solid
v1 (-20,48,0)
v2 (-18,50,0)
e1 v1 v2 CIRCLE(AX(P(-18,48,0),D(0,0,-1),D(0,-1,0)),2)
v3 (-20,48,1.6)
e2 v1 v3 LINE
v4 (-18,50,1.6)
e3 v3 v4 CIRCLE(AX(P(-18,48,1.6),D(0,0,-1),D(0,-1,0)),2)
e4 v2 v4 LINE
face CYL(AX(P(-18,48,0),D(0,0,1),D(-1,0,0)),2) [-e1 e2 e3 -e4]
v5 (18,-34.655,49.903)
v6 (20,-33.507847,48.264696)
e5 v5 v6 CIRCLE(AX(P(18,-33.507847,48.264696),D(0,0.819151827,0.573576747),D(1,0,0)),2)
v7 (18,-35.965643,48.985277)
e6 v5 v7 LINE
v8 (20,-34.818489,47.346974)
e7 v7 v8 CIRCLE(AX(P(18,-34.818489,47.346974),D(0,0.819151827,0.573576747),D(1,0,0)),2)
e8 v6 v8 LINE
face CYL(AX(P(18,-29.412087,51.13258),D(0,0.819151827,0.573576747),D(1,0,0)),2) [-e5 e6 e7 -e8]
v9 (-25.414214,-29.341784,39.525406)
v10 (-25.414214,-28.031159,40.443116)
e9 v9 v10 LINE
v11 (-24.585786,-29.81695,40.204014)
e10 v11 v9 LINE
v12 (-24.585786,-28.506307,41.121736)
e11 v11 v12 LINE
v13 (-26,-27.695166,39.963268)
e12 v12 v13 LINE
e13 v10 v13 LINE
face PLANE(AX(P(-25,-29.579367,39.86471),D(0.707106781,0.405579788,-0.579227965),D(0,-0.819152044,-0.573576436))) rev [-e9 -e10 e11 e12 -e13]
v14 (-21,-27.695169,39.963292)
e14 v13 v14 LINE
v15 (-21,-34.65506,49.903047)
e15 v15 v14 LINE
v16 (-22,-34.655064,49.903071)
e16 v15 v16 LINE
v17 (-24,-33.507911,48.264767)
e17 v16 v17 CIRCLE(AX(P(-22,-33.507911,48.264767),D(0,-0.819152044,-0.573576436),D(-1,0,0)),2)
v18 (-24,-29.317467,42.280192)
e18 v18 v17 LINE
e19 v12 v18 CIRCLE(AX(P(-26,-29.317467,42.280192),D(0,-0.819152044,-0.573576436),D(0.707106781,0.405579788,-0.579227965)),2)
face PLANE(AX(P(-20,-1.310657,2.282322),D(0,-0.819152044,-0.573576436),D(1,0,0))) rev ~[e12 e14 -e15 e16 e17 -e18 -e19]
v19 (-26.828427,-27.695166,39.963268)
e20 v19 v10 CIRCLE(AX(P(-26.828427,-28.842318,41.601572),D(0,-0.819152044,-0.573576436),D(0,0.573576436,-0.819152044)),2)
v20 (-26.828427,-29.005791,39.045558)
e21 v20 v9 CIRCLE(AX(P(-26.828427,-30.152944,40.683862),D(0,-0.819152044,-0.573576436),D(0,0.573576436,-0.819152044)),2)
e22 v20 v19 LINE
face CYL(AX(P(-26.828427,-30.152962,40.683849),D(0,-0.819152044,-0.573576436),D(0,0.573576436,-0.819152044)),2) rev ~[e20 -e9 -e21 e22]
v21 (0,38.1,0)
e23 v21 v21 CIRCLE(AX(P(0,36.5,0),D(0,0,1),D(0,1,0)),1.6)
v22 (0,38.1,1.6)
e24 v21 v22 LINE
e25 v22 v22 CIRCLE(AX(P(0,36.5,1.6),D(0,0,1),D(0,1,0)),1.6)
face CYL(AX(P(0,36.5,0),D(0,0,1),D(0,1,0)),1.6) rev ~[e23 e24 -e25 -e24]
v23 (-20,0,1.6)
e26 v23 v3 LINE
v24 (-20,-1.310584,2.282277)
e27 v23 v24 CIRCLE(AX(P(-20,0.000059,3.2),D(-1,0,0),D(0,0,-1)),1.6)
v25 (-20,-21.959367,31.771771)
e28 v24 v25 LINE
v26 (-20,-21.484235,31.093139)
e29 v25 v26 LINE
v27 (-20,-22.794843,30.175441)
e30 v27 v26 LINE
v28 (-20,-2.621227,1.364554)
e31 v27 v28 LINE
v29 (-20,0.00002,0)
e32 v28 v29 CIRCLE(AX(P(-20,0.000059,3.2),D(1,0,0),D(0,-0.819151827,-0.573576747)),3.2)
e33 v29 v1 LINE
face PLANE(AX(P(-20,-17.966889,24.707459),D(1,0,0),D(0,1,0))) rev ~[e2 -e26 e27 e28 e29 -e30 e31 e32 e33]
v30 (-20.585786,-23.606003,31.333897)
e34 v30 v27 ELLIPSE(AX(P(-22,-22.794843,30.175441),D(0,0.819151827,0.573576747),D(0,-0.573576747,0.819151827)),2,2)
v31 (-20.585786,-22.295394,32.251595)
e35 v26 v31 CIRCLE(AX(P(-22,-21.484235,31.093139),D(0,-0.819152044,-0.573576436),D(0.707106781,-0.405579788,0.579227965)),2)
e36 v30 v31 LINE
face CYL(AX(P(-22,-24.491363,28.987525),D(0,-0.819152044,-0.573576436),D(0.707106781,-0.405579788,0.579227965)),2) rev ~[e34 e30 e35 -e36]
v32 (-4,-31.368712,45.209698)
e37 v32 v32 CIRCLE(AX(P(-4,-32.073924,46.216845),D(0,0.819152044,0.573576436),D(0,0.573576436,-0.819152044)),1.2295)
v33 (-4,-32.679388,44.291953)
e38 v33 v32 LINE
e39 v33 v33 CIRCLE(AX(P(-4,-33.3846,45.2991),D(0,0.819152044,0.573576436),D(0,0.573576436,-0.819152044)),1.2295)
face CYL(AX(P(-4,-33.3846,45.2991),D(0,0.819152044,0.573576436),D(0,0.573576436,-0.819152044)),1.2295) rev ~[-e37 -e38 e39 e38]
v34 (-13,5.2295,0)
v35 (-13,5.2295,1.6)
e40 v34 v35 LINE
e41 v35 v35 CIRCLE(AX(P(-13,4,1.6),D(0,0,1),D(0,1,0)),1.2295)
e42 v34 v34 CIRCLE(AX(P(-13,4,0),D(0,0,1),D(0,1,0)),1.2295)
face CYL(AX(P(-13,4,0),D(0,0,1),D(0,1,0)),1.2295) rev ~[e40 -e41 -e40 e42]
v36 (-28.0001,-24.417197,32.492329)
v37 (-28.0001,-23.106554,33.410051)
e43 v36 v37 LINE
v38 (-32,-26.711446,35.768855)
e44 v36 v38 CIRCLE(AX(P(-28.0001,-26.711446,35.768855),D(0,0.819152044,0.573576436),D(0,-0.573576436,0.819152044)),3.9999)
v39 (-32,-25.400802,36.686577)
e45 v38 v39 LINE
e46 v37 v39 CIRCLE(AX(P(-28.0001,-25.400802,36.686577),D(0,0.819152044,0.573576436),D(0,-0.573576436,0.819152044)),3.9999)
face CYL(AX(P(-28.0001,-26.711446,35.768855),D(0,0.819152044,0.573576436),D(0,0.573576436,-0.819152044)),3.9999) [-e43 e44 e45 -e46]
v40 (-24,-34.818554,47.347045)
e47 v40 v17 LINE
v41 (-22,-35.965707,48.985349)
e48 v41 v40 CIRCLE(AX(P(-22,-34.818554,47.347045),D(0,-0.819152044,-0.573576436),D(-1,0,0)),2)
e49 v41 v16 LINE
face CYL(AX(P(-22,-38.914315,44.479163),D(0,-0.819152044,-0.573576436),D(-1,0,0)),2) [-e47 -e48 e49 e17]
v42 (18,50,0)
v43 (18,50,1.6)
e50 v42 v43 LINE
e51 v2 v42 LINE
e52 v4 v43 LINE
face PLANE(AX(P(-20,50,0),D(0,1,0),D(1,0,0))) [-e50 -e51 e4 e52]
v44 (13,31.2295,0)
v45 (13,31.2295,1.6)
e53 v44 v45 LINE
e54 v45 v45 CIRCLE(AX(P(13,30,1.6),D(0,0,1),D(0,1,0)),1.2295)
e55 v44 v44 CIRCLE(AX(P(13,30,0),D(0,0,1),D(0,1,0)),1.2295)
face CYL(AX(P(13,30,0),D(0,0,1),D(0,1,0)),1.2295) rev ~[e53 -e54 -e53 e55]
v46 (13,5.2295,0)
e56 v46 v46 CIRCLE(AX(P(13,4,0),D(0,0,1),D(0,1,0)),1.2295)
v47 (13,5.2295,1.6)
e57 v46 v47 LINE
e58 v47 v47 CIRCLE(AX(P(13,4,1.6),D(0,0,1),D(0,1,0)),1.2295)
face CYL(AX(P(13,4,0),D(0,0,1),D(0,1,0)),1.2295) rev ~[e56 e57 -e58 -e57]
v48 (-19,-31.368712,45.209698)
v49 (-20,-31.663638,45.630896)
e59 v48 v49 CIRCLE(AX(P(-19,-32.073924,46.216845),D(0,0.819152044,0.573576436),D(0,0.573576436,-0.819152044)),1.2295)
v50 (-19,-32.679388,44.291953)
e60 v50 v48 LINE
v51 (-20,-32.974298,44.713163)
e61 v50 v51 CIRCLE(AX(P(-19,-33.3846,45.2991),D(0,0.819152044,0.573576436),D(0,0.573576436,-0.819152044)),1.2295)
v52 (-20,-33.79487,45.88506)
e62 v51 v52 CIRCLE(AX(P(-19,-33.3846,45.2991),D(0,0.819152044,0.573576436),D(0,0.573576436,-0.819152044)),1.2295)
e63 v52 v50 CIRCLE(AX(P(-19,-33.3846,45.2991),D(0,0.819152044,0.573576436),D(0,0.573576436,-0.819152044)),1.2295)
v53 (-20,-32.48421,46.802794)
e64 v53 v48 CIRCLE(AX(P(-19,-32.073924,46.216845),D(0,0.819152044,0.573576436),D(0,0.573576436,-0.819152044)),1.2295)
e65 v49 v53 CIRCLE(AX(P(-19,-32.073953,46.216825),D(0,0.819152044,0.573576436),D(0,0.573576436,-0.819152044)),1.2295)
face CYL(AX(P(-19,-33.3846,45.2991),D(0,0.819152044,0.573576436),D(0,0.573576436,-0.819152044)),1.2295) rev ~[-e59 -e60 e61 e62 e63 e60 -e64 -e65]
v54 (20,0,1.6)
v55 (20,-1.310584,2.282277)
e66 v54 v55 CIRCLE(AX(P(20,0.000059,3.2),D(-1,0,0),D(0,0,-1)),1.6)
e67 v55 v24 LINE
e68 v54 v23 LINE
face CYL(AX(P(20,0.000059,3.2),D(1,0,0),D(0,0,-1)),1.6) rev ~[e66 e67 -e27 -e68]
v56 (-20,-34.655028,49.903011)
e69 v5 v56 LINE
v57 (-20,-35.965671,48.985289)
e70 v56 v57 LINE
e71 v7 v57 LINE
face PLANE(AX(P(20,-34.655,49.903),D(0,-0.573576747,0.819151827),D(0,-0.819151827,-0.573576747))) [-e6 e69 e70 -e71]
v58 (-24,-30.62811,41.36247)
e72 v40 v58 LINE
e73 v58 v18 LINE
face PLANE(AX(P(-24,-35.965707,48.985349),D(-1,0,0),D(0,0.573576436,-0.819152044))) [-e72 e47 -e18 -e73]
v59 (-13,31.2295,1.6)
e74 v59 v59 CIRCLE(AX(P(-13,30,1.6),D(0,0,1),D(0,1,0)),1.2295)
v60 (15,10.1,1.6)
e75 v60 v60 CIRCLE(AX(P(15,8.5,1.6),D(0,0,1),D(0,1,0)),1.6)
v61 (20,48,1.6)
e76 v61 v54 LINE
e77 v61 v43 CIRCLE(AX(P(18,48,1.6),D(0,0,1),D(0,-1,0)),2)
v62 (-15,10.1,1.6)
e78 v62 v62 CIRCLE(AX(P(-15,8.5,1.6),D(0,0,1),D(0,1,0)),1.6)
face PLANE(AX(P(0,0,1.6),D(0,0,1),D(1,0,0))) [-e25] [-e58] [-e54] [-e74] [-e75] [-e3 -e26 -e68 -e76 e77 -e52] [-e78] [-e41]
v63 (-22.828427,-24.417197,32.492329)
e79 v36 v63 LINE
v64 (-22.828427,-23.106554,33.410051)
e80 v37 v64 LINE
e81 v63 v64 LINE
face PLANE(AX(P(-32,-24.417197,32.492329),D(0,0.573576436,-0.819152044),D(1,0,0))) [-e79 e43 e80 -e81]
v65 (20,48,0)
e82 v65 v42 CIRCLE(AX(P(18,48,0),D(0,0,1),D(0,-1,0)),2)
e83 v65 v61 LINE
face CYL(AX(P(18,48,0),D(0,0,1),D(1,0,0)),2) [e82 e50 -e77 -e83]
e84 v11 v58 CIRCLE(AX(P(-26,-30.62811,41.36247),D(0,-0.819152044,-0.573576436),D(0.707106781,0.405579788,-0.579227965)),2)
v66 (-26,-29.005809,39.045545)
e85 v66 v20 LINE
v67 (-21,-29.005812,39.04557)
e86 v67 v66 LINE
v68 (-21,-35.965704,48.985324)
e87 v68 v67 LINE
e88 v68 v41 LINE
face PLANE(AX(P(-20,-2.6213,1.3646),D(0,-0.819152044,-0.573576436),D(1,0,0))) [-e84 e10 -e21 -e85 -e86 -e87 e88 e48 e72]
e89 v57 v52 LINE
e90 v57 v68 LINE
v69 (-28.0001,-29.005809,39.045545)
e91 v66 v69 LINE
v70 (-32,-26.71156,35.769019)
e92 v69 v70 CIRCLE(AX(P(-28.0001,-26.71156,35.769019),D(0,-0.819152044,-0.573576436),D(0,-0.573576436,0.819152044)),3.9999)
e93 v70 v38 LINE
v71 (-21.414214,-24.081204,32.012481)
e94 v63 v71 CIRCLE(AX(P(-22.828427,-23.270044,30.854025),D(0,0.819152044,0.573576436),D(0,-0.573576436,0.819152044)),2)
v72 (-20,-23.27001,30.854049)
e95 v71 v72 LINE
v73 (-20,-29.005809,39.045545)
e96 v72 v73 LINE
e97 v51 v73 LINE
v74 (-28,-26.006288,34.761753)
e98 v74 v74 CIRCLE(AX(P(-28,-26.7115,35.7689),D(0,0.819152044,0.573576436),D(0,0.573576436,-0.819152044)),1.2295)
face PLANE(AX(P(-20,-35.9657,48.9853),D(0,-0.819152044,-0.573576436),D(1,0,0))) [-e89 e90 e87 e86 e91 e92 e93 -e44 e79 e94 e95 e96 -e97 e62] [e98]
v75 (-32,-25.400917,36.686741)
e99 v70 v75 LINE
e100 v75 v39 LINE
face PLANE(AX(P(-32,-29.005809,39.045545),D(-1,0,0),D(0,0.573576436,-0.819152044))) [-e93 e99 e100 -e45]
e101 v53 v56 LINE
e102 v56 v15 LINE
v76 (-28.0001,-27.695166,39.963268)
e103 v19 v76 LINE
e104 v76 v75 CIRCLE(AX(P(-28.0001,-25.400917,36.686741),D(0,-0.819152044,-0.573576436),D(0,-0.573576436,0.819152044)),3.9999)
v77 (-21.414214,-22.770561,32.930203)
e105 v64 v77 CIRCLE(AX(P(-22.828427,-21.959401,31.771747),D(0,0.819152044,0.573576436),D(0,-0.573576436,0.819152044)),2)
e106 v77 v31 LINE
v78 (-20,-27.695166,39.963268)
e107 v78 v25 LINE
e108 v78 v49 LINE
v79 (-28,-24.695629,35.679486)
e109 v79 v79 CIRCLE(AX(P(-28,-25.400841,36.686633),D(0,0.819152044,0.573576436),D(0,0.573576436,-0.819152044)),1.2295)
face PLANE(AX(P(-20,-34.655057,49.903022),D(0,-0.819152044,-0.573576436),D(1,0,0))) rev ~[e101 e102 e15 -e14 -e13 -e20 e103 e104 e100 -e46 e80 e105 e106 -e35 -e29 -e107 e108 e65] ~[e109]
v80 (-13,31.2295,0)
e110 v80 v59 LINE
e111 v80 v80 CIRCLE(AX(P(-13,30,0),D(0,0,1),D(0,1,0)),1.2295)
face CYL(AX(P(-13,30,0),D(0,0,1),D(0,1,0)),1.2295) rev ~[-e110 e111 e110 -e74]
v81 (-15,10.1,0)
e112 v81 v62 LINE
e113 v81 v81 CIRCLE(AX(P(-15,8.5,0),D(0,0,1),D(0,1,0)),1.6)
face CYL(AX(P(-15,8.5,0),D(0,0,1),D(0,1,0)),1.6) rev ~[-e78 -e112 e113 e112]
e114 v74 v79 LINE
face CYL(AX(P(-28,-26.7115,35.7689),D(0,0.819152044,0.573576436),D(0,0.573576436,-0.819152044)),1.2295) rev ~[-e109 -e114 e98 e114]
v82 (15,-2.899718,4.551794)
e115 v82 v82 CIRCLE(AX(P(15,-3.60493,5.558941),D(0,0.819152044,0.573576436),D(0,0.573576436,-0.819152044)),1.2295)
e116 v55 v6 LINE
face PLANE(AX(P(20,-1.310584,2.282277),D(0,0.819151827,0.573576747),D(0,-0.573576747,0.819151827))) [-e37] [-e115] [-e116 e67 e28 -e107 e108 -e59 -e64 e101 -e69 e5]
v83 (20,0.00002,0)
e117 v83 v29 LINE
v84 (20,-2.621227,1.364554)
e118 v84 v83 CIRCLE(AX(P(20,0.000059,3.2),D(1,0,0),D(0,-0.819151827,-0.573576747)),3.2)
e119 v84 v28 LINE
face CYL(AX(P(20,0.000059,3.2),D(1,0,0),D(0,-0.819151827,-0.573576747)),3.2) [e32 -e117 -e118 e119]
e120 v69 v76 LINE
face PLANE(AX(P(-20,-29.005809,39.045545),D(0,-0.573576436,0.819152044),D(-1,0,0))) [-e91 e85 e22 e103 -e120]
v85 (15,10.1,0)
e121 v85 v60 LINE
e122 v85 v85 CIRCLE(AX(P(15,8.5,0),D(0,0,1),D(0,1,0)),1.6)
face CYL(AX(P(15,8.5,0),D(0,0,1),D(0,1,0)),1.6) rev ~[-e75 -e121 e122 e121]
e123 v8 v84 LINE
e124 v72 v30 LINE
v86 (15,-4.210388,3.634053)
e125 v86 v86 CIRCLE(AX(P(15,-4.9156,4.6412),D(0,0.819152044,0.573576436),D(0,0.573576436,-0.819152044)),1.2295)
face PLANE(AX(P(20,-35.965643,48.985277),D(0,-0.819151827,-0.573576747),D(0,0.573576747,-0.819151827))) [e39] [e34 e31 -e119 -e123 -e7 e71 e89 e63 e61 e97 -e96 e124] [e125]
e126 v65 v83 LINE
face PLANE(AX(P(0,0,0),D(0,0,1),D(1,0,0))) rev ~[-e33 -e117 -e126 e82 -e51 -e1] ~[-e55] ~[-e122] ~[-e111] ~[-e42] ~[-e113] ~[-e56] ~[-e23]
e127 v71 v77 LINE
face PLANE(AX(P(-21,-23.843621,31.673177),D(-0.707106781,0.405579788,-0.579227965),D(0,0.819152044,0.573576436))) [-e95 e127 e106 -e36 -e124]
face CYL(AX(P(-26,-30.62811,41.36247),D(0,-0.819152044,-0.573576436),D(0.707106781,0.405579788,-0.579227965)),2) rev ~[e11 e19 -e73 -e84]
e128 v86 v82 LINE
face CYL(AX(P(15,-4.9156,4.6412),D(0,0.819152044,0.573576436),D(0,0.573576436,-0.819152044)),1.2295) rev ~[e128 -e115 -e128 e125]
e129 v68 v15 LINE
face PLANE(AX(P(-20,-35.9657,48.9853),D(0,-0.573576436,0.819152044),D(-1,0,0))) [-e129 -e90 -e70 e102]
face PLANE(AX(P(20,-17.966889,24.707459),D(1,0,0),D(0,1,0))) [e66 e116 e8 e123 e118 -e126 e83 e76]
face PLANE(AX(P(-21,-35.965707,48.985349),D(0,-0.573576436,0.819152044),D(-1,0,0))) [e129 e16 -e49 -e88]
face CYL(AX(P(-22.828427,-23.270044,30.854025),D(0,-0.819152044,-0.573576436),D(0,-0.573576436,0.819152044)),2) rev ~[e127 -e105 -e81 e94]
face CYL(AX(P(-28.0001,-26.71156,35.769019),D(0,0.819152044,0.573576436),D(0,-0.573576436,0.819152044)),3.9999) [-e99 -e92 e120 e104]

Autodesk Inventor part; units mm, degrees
ref_plane "YZ Plane" through (0, 0, 0) normal (1, 0, 0) x (0, 1, 0)
ref_plane "XZ Plane" through (0, 0, 0) normal (0, 1, 0) x (-1, 0, 0)
ref_plane "XY Plane" through (0, 0, 0) normal (0, 0, 1) x (1, 0, 0)
sketch "スケッチ1" plane through (0, 0, 0) normal (0, 0, 1) x (1, 0, 0)
  line L0 (20, 0) -> (-20, 0)
  line L1 (-20, 0) -> (-20, 50)
  line L2 (-20, 50) -> (20, 50)
  line L3 (20, 50) -> (20, 0)
  line L4 (20, 0) -> (-20, 50) construction
  line L5 (-20, 0) -> (20, 50) construction
  point P0 (0, 0)
  point P1 (0, 25)
  point P2 (0, 0)
  point P3 (0, 25)
  dimension "d0" = 40
  dimension "d1" = 50
extrude "プレート1" add sketch "スケッチ1" along normal blind 1.6
sketch "スケッチ2" plane through (20, -1.3106, 2.2823) normal (0, -0.819152, -0.5735764) x (1, 0, 0)
  line L0 (-40, 0) -> (0, 0)
  line L1 (0, 0) -> (0, 58.1342)
  line L2 (0, 58.1342) -> (-40, 58.1342)
  line L3 (-40, 58.1342) -> (-40, 0)
edge flange "フランジ1" height 59.8 angle 55 thickness 1.6 bend radius 1.6 thickness toward (0, -0.819152, -0.5735764) relief tear relief width 1.6 relief depth 0.8 edges at (0, 0, 1.6) wall of the first edge with corners at (-20, -1.3106, 2.2823) (20, -1.3106, 2.2823) (20, -34.655, 49.903) (-20, -34.655, 49.903)
bend "曲げ1"
corner "コーナー1"
sketch "スケッチ3" plane through (0, 0, 0) normal (0, 0, -1) x (-1, 0, 0)
  line L0 (-20, 0) -> (20, 0) projected
  line L1 (20, 0) -> (20, 50) projected
  line L2 (20, 50) -> (-20, 50) projected
  line L3 (-20, 50) -> (-20, 0) projected
  line L4 (-20, 0) -> (20, 0) projected
  point P0 (0, 0)
  point P1 (-13, 4)
  point P2 (13, 4)
  point P3 (0, 4)
  point P4 (0, 0)
  point P5 (0, 0)
  point P6 (0, 4)
  point P7 (-13, 30)
  point P8 (13, 30)
  dimension "d62" = 4
  dimension "d85" = 26
  dimension "d86" = 13
  dimension "d90" = 26
hole "穴1" at (13, 4, 0) at (-13, 4, 0) at (13, 30, 0) at (-13, 30, 0) direction (0, 0, 1) diameter 2.459 depth 8.8 tip angle 118 thread size "M3x0.5" class "6H" standard "ISO Metric profile"
sketch "スケッチ4" plane through (-20, -35.9657, 48.9853) normal (0, -0.819152, -0.5735764) x (1, 0, 0)
  line L0 (0, -58.1342) -> (40, -58.1342) projected
  line L1 (40, 0) -> (40, -58.1342) projected
  line L2 (0, 0) -> (40, 0) projected
  line L3 (0, -58.1342) -> (0, 0) projected
  point P0 (20, -60.7555)
  point P1 (35, -54.1342)
  dimension "d23" = 5
  dimension "d24" = 4
hole "穴2" at (15, -4.9156, 4.6412) direction (0, 0.819152, 0.5735764) diameter 2.459 end through all thread size "M3x0.5" class "6H" standard "ISO Metric profile"
sketch "スケッチ5" plane through (-20, -35.9657, 48.9853) normal (0, -0.819152, -0.5735764) x (1, 0, 0)
  circle A0 centre (35, -54.1342) radius 1.2295 projected
  line L0 (0, 0) -> (0, -58.1342) projected
  line L1 (0, -12.1342) -> (-12, -12.1342)
  line L2 (-12, -12.1342) -> (-12, -20.1342)
  line L3 (-12, -20.1342) -> (0, -20.1342)
  line L4 (0, -20.1342) -> (0, -12.1342)
  point P0 (20, -60.7555)
  point P1 (-8, -16.1342)
  point P2 (0, -20.1342)
  dimension "d32" = 43
  dimension "d33" = 38
  dimension "d34" = 4
  dimension "d35" = 8
  dimension "d36" = 4
extrude "押し出し1" add sketch "スケッチ5" against normal up to surface (1.6 mm away) contours L0 L3 L2 L1
sketch "スケッチ6" plane through (-20, -35.9657, 48.9853) normal (0, -0.819152, -0.5735764) x (1, 0, 0)
  circle A0 centre (35, -54.1342) radius 1.2295 projected
  point P0 (20, -60.7555)
  point P1 (-8, -16.1342)
  dimension "d39" = 43
  dimension "d40" = 38
hole "穴3" at (-28, -26.7115, 35.7689) direction (0, 0.819152, 0.5735764) diameter 2.459 depth 8.8 tip angle 118 thread size "M3x0.5" class "6H" standard "ISO Metric profile"
fillet "フィレット1" radius 4 2 edges at (-32, -23.7619, 32.9512) (-32, -28.3505, 39.5044)
fillet "フィレット2" radius 2 2 edges at (20, 50, 0.8) (-20, 50, 0.8)
sketch "スケッチ8" plane through (-20, -35.9657, 48.9853) normal (0, -0.819152, -0.5735764) x (1, 0, 0)
  line L0 (0, 0) -> (0, -12.1342) projected
  line L1 (0, 0) -> (-1, 0)
  line L2 (-1, 0) -> (-1, -12.1342)
  line L3 (-1, -12.1342) -> (0, -12.1342)
  line L4 (0, -12.1342) -> (0, 0)
  point P0 (20, -60.7555)
  point P1 (0, -12.1342)
  dimension "d63" = 1
extrude "押し出し3" add sketch "スケッチ8" against normal up to surface (1.6 mm away)
sketch "スケッチ9" plane through (-20, -2.6213, 1.3646) normal (0, -0.819152, -0.5735764) x (1, 0, 0)
  line L0 (40, 58.1342) -> (-1, 58.1342) projected
  line L1 (-1, 58.1342) -> (-1, 46) projected
  point P0 (20, -2.6213)
  point P1 (1, 53.6342)
  point P2 (16, 53.6342)
  dimension "d66" = 4.5
  dimension "d67" = 15
  dimension "d68" = 2
hole "穴4" at (-19, -33.3846, 45.2991) at (-4, -33.3846, 45.2991) direction (0, 0.819152, 0.5735764) diameter 2.459 end through all thread size "M3x0.5" class "6H" standard "ISO Metric profile"
sketch "スケッチ10" plane through (-20, -2.6213, 1.3646) normal (0, -0.819152, -0.5735764) x (1, 0, 0)
  line L0 (43, 58.1342) -> (-4, 58.1342)
  line L1 (-4, 58.1342) -> (-4, 50.1342)
  line L2 (-4, 50.1342) -> (43, 50.1342)
  line L3 (43, 50.1342) -> (43, 58.1342)
  line L4 (-1, 58.1342) -> (-1, 46) projected
  line L5 (40, 58.1342) -> (40, 0) projected
  line L6 (-1, 46) -> (-8, 46) projected
  line L7 (-4, 50.1342) -> (-1, 50.1342)
  line L8 (-1, 50.1342) -> (-1, 46)
  line L9 (-1, 46) -> (-4, 46)
  line L10 (-4, 46) -> (-4, 50.1342)
  point P0 (20, -2.6213)
  point P1 (-4, 46)
  dimension "d76" = 3
  dimension "d77" = 3
  dimension "d78" = 8
extrude "押し出し4" add sketch "スケッチ10" against normal up to surface (1.6 mm away) contours L4 L2 L1 L0 | L4 L6 L10 L2
chamfer "面取り4" distance 2 angle 45 2 edges at (-20, -23.7619, 32.9512) (-24, -28.3505, 39.5044)
fillet "フィレット3" radius 2 6 edges at (-20, -22.6147, 31.3129) (-22, -23.7619, 32.9512) (-26, -28.3505, 39.5044) (-24, -29.4976, 41.1427) (-24, -35.3104, 49.4442) (20, -35.3104, 49.4442)
sketch "スケッチ12" plane through (0, 0, 0) normal (0, 0, -1) x (-1, 0, 0)
  line L0 (-15, 36.5) -> (15, 36.5)
  line L1 (15, 36.5) -> (15, 8.5)
  line L2 (15, 8.5) -> (-15, 8.5)
  line L3 (-15, 8.5) -> (-15, 36.5)
  line L4 (-20, 0) -> (20, 0) projected
  point P0 (0, 0)
  point P1 (0, 36.5)
  dimension "d91" = 28
  dimension "d92" = 30
  dimension "d93" = 15
  dimension "d94" = 8.5
hole "穴5" at (15, 8.5, 0) at (-15, 8.5, 0) at (0, 36.5, 0) direction (0, 0, 1) diameter 3.2 depth 1.6 tip angle 118
equation "\"d86\" = 0.5 * d85"
equation "\"d30\" = Thickness"
equation "\"d100\" = Thickness"
equation "\"d2\" = Thickness"
equation "\"d3\" = BendReliefWidth"
equation "\"d4\" = BendReliefDepth"
equation "\"d5\" = MinimumRemnant"
equation "\"d6\" = TransitionRadius"
equation "\"d9\" = BendRadius"
equation "\"d10\" = CornerReliefSize"
equation "\"d11\" = GapSize"
equation "\"d12\" = JacobiRadiusSize"
equation "\"BendRadius\" = Thickness"
equation "\"BendReliefWidth\" = Thickness"
equation "\"BendReliefDepth\" = 0.5 * Thickness"
equation "\"CornerReliefSize\" = 4 * Thickness"
equation "\"MinimumRemnant\" = 2 * Thickness"
equation "\"TransitionRadius\" = BendRadius"
equation "\"JacobiRadiusSize\" = BendRadius"
equation "\"GapSize\" = Thickness"
equation "\"Thickness\" = 1.6"
properties part number "Fan_Holder"
